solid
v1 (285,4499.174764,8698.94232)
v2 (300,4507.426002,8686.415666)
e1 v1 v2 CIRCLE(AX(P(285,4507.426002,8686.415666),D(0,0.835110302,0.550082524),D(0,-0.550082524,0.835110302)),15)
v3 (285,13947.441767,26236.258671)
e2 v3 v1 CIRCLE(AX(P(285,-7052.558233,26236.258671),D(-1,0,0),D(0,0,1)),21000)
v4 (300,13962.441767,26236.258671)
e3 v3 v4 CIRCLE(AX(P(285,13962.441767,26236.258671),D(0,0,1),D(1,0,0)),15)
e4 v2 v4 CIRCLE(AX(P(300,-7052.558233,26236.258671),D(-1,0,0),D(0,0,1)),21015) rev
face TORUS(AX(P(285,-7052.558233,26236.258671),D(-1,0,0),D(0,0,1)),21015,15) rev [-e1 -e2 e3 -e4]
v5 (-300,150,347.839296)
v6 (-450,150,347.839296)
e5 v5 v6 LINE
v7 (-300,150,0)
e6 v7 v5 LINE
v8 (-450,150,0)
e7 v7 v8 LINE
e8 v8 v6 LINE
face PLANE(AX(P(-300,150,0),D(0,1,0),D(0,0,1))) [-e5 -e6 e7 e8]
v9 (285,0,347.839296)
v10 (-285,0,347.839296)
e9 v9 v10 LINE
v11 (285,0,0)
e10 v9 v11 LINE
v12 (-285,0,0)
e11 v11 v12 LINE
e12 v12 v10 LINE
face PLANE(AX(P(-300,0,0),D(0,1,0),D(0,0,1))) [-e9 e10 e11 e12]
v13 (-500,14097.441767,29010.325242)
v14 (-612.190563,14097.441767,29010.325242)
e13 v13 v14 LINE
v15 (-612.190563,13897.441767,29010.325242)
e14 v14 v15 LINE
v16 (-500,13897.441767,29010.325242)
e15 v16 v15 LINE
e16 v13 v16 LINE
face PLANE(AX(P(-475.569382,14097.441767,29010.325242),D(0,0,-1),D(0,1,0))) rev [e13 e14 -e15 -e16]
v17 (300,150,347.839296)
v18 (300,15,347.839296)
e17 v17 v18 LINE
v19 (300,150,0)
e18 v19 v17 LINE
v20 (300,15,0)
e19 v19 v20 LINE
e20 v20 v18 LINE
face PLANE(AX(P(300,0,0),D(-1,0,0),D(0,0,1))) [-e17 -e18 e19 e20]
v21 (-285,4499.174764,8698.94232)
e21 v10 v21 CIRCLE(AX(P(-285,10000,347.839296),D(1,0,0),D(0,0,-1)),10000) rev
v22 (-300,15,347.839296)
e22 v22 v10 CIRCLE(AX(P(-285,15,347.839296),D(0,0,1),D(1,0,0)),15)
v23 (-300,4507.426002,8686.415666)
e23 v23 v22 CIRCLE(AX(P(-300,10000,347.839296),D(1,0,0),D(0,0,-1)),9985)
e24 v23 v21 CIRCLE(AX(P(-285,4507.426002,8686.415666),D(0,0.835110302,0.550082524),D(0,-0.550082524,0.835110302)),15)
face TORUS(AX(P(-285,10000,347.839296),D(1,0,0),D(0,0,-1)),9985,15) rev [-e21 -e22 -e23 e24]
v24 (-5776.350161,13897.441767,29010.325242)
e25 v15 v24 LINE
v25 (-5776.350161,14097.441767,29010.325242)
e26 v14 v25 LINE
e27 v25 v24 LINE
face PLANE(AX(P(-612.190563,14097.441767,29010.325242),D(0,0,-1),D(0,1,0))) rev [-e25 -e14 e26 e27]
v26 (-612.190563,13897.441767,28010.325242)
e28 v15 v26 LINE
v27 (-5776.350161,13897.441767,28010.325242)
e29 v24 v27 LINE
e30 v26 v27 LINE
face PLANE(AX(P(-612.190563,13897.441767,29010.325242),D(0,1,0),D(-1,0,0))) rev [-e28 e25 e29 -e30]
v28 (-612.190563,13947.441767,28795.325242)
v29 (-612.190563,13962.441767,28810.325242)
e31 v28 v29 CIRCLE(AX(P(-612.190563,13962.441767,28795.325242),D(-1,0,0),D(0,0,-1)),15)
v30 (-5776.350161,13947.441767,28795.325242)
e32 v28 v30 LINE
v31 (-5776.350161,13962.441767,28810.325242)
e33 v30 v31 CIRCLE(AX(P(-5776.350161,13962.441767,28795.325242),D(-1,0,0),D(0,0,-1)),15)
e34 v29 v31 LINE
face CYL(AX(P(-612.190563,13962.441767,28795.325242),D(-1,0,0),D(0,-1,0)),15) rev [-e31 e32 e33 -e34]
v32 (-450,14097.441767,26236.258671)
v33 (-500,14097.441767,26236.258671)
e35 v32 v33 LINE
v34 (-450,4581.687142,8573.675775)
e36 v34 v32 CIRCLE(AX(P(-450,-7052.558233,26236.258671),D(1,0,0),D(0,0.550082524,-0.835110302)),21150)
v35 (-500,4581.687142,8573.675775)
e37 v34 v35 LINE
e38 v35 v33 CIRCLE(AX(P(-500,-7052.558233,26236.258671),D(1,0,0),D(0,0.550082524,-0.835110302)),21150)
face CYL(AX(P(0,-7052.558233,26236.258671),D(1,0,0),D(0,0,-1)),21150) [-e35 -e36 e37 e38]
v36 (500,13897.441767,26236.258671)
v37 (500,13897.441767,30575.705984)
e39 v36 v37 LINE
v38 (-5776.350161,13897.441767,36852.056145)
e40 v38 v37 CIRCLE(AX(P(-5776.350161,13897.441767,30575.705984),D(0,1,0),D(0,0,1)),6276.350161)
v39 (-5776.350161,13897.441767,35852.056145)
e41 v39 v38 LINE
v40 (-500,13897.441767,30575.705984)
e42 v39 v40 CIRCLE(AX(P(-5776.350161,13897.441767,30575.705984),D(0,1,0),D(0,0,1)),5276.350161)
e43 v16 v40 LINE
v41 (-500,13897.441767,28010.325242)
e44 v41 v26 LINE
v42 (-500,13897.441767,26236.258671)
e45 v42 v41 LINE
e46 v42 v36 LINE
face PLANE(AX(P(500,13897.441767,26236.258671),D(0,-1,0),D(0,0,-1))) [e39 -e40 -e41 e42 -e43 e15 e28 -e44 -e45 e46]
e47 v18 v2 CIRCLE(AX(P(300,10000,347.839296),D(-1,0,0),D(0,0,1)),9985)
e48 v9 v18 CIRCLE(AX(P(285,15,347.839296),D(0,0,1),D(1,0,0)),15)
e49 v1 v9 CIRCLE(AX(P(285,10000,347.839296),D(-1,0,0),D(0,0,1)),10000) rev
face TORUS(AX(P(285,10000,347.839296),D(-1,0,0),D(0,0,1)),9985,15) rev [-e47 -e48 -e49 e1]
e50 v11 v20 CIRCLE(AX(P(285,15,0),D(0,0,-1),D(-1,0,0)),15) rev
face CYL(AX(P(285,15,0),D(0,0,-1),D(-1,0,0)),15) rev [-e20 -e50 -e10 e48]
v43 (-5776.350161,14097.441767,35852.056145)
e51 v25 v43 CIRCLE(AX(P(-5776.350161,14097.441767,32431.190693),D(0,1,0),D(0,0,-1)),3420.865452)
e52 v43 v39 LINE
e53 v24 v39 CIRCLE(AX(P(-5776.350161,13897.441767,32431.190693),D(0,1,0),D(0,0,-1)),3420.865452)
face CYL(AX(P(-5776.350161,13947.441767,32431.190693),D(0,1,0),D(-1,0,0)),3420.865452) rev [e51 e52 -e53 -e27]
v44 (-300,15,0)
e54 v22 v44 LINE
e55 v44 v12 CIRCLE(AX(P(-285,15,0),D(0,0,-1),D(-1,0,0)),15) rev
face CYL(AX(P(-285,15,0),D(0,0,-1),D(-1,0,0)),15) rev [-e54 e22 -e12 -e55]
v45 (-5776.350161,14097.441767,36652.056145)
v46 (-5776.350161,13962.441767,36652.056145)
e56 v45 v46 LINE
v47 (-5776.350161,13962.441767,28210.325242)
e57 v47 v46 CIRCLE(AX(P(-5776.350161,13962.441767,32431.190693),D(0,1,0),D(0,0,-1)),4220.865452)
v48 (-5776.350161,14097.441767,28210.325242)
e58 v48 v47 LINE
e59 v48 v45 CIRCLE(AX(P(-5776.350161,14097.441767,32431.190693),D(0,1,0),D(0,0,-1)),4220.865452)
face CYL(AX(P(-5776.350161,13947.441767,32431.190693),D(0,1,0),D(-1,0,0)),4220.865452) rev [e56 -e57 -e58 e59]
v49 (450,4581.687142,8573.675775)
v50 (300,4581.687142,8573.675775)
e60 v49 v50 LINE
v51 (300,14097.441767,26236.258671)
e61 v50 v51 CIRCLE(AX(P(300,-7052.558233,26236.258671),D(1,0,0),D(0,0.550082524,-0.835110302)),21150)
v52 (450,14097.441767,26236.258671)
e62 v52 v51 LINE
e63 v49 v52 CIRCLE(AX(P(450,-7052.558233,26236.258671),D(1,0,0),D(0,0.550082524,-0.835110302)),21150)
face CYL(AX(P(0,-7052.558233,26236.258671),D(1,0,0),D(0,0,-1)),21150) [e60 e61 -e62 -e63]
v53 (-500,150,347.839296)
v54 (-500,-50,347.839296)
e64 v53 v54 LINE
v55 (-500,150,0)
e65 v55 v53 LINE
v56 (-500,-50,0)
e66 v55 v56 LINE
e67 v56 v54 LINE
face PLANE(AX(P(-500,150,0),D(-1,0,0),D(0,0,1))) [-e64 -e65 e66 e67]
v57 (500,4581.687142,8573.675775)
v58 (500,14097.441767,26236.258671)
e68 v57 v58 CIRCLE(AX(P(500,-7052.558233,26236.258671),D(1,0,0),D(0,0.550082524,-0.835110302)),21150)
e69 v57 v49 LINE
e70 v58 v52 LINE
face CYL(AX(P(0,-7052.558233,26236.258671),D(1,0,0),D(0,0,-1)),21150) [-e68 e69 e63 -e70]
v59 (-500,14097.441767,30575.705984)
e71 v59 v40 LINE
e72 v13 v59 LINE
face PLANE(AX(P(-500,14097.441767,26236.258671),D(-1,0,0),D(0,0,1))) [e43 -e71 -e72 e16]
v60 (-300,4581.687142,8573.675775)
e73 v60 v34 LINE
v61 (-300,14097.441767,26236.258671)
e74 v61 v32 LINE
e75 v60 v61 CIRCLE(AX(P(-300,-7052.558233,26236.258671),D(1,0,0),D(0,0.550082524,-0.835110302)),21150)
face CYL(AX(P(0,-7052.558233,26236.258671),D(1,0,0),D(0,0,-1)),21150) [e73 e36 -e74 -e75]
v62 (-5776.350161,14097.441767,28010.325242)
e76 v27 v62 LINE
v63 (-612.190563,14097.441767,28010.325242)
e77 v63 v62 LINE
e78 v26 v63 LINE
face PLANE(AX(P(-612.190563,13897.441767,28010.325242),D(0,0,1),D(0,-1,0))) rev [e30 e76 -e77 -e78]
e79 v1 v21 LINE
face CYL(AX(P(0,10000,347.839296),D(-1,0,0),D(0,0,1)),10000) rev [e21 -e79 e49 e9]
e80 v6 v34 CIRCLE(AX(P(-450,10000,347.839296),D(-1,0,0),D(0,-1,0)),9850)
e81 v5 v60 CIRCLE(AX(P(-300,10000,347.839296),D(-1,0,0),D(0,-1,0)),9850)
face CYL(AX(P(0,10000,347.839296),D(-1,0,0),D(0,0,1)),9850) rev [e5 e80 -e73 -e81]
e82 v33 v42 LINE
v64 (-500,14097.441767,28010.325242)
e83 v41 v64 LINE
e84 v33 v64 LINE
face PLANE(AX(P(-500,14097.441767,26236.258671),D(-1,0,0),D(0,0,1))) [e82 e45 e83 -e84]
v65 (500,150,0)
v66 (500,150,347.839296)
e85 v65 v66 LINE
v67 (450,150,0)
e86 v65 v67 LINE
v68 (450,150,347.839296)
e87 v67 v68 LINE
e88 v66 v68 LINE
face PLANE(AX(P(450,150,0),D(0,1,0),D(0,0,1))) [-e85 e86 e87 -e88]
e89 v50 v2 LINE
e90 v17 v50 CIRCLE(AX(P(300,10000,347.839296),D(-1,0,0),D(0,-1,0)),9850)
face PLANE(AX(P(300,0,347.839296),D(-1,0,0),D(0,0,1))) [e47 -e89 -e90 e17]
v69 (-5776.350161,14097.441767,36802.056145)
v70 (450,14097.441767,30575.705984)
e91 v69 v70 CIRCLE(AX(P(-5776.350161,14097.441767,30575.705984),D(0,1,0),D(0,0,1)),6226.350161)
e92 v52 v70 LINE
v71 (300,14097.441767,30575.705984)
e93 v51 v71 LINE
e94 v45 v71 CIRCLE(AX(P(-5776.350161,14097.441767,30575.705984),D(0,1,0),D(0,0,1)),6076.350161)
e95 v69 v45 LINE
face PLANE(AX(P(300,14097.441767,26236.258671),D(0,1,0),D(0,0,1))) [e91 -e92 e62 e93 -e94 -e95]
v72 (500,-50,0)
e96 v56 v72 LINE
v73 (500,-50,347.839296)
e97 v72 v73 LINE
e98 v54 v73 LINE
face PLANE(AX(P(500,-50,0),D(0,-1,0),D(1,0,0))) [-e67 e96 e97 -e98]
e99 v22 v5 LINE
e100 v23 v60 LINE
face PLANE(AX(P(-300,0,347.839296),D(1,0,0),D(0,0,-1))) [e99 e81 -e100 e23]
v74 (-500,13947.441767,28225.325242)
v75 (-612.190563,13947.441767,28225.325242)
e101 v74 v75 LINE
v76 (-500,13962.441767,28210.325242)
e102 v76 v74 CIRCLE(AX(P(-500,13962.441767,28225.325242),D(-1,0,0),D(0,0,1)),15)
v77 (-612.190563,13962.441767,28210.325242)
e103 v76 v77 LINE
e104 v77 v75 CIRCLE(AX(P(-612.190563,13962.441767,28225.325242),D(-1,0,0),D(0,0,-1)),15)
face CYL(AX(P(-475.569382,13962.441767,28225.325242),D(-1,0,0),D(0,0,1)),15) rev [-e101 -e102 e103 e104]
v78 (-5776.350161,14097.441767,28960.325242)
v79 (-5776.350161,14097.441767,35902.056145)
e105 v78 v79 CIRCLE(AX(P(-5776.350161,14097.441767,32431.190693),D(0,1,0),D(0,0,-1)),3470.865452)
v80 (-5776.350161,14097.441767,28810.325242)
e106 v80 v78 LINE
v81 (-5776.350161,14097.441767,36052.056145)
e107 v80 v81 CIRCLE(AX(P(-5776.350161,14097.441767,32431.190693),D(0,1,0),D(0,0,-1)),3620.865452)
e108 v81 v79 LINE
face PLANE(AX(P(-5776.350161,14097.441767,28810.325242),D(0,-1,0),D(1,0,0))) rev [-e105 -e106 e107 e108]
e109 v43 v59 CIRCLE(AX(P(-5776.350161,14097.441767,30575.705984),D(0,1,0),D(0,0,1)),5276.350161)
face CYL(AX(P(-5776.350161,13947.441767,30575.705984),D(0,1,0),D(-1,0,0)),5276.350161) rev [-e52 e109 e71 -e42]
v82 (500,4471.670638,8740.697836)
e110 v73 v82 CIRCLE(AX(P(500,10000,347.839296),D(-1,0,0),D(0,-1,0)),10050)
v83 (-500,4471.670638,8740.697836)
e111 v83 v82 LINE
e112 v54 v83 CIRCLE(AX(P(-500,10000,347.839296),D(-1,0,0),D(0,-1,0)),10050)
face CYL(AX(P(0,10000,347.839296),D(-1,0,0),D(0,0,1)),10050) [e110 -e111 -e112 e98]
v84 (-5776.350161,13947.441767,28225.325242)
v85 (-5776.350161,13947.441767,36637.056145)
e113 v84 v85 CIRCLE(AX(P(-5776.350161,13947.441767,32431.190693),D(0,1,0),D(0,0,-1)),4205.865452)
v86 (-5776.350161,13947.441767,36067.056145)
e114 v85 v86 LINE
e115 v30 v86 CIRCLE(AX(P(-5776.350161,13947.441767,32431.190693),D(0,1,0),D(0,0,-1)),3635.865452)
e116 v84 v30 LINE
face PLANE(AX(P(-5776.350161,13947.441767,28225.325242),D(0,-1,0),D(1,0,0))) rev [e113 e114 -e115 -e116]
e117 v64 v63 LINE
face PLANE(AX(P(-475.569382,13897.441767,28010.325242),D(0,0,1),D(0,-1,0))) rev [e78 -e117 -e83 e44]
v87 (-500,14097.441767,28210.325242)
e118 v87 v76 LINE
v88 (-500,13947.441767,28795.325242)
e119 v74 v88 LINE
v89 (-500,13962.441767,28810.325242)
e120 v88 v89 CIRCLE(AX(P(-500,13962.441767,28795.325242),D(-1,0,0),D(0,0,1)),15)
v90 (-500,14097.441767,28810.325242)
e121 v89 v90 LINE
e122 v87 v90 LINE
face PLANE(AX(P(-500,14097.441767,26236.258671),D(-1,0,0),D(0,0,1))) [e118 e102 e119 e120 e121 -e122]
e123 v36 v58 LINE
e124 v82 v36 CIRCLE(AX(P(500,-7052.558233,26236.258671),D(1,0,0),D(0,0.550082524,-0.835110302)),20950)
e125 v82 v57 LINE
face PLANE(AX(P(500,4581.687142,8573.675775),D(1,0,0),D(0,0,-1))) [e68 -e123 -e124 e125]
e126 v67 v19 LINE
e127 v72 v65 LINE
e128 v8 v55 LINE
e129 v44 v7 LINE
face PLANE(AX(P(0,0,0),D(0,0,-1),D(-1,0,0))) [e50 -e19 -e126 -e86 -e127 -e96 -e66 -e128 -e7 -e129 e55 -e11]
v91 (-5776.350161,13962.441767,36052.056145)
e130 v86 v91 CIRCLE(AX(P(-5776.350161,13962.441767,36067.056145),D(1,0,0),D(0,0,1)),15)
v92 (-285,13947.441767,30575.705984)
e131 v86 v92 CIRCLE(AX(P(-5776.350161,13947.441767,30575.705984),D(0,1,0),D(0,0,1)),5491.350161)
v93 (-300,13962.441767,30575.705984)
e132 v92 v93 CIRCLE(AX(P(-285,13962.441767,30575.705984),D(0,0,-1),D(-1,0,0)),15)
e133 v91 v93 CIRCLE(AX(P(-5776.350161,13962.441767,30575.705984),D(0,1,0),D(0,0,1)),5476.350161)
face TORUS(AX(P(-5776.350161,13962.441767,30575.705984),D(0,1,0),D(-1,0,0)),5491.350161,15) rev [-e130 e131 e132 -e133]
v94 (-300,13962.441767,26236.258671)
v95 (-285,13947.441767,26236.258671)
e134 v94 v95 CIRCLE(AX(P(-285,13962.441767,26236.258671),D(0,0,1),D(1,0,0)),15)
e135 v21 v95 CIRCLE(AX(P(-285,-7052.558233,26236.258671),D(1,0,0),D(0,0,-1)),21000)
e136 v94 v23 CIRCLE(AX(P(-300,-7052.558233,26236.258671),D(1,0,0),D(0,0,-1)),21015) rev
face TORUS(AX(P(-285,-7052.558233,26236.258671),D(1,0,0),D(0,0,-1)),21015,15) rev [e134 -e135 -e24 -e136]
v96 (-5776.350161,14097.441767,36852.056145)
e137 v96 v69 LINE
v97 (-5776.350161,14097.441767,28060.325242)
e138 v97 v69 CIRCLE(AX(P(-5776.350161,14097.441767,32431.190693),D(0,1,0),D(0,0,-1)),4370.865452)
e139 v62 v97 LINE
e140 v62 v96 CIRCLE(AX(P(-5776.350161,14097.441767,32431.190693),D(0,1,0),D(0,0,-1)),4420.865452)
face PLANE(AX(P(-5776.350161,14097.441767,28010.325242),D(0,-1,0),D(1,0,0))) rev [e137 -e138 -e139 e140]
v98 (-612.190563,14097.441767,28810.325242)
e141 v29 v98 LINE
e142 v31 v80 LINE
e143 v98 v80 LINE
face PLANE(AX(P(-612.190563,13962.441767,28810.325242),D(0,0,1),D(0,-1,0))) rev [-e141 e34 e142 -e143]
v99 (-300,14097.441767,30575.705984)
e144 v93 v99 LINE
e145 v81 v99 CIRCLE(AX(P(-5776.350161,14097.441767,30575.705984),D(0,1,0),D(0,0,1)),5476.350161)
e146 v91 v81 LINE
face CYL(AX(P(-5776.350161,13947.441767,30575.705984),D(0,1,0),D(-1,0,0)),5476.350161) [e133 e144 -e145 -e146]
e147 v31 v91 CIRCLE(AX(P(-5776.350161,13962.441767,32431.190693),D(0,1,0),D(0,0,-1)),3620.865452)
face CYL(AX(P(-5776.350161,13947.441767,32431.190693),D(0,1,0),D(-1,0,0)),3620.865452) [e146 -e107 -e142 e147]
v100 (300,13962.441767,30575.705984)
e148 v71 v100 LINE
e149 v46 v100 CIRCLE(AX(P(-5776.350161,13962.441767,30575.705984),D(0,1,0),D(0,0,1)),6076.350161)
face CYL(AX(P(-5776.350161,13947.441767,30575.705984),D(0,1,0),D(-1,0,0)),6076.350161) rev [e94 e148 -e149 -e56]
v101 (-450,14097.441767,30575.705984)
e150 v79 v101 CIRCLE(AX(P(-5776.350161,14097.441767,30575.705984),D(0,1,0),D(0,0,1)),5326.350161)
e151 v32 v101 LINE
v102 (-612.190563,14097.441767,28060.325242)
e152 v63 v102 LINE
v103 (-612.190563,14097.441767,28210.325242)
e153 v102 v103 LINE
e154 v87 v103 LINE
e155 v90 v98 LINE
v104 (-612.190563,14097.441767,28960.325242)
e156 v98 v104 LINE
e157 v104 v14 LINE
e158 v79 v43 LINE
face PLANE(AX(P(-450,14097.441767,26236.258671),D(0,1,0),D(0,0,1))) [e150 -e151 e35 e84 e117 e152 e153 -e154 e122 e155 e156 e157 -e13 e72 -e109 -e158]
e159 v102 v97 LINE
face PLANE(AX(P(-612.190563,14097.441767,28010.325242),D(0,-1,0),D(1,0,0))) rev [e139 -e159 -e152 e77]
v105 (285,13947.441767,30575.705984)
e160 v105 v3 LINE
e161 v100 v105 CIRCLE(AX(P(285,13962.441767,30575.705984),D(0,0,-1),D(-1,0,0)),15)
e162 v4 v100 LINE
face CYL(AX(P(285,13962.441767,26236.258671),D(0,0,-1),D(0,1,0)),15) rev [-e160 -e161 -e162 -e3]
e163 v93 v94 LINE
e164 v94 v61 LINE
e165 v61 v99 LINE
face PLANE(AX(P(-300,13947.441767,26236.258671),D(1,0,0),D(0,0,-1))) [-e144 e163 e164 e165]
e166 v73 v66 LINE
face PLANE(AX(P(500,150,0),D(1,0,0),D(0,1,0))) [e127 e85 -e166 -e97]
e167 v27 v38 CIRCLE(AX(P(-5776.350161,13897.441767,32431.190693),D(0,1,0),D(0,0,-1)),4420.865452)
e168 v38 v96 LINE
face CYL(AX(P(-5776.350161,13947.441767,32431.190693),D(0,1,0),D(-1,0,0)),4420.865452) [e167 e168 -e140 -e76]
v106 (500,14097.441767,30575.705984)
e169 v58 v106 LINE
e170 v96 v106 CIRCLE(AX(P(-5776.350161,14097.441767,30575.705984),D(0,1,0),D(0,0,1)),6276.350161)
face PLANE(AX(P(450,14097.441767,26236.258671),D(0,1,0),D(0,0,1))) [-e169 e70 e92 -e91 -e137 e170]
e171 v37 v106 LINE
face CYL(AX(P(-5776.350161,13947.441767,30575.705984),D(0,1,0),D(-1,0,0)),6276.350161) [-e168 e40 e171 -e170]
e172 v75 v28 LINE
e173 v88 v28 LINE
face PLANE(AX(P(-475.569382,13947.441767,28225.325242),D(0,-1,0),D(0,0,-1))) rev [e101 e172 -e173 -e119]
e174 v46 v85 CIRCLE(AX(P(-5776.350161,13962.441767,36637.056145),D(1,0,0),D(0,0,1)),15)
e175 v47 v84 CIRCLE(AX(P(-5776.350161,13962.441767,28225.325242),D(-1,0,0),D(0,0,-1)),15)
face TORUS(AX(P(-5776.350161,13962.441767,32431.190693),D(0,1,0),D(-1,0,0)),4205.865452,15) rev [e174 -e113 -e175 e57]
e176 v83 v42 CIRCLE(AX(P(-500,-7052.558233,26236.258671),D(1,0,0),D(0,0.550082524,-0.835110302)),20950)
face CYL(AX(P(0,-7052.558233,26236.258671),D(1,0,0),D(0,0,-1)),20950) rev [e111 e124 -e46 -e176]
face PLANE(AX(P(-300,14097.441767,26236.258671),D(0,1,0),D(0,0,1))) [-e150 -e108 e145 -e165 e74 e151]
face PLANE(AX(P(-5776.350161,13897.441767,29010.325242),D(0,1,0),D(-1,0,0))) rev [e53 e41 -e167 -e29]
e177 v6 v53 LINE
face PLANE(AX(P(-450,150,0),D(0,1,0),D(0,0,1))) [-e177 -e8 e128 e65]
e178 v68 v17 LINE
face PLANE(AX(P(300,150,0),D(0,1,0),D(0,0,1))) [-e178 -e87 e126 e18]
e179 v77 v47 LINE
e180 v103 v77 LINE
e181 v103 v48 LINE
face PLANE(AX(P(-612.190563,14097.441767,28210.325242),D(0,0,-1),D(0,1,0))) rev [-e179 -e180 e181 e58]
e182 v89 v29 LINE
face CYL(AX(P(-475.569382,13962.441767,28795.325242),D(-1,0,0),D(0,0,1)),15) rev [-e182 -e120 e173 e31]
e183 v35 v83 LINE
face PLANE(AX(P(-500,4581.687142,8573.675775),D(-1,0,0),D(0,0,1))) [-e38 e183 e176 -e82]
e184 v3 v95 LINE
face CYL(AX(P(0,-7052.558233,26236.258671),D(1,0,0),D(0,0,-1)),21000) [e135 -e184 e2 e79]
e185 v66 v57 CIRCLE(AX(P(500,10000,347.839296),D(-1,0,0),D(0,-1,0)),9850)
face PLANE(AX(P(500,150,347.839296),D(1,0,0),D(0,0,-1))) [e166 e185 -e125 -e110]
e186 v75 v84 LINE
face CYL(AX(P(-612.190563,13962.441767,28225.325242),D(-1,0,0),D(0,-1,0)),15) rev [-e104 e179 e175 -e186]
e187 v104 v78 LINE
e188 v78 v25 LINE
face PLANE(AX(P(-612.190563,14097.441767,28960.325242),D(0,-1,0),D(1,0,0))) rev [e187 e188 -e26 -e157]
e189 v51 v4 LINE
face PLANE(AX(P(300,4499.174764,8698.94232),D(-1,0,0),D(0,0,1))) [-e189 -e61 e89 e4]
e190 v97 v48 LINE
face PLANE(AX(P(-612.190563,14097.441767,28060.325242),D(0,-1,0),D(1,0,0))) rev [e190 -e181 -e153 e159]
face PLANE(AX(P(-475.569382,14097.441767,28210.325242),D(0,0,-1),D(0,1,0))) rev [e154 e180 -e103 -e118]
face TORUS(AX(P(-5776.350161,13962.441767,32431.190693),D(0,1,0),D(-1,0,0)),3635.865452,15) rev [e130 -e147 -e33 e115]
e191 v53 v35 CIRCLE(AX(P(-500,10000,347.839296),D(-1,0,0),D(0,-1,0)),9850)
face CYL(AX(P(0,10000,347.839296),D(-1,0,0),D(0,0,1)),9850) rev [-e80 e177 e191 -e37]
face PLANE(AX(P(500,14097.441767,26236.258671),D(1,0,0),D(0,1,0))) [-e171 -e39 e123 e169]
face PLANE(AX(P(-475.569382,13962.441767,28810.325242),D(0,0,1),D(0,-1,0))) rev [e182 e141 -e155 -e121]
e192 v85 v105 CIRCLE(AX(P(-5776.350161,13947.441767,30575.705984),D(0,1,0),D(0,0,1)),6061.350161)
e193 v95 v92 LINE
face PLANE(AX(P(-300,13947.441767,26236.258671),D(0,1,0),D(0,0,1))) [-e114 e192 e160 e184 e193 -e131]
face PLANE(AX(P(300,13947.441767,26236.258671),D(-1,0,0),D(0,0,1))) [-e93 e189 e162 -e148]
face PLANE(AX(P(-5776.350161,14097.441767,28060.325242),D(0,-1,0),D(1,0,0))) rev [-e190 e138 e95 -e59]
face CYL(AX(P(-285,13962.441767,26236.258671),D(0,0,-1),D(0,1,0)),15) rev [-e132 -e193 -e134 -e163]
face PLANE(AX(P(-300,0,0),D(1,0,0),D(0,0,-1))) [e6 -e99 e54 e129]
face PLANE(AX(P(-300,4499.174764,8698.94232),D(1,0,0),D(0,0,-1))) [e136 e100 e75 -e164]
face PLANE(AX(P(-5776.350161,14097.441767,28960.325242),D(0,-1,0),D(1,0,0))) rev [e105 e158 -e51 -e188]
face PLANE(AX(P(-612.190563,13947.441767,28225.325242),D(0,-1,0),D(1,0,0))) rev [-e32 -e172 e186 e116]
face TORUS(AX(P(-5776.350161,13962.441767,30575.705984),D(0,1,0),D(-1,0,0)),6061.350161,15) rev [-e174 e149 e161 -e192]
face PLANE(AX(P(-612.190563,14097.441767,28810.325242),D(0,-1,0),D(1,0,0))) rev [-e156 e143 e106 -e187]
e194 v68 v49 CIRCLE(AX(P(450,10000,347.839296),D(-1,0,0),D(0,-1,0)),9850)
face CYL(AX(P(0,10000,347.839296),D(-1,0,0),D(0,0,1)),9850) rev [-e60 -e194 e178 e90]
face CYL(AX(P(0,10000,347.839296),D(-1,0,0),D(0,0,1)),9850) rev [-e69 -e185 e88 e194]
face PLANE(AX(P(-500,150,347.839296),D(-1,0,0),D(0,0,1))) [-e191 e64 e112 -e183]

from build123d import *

# Parameters (mm, degrees)
FILLET3_R      = 15
FILLET4_R      = 15
SWEEP3_START   = 13897.441767453
SWEEP3_DEPTH   = 200
SWEEP3_2_DEPTH = 50
SWEEP3_START_2 = -5776.350160621
SWEEP3_3_DEPTH = 5476.350160621
SWEEP3_4_ANGLE = 180
SWEEP3_5_ANGLE = 90


with BuildPart() as part:
    # Sweep1: sweep along a path in Sketch3
    with BuildLine(Plane(origin=(0, 0, 0), x_dir=(0, 0, -1), z_dir=(1, 0, 0))) as sweep1_path:
        Line((0, 0), (-347.839296309, 0))
        ThreePointArc((-347.839296309, 0), (-5090.820828897, 1196.357220927), (-8698.942320439, 4499.174763695))
        ThreePointArc((-8698.942320439, 4499.174763695), (-16275.997452676, 11435.091603507), (-26236.258671111, 13947.441767453))
        Line((-26236.258671111, 13947.441767453), (-30575.705984425, 13947.441767453))
    # Sketch1 → Sweep1 (sweep)
    with BuildSketch(Plane.XY):
        Polygon((-300, 0), (300, 0), (300, 150), (450, 150), (500, 150), (500, -50), (-500, -50), (-500, 150), (-450, 150), (-300, 150), align=None)
    sweep(path=sweep1_path.line)

    # Fillet3
    fillet3_edges = [part.edges().sort_by_distance(p)[0] for p in [
        (300, 1196.357220927, 5090.820828897),
        (300, 11435.091603507, 16275.997452676),
        (300, 13947.441767453, 28405.982327768),
        (300, 0, 173.919648155),
    ]]
    fillet(fillet3_edges, radius=FILLET3_R)

    # Fillet4
    fillet4_edges = [part.edges().sort_by_distance(p)[0] for p in [
        (-300, 11435.091603507, 16275.997452676),
        (-300, 13947.441767453, 28405.982327768),
        (-300, 0, 173.919648155),
        (-300, 1196.357220927, 5090.820828897),
    ]]
    fillet(fillet4_edges, radius=FILLET4_R)

    # Sweep3: read off the stored shape, not the designer's step
    # Sweep3 outline → Sweep3 (add)
    with BuildSketch(Plane(origin=(0, 0, 0), x_dir=(1, 0, 0), z_dir=(0, 1, 0)).offset(SWEEP3_START)):
        with BuildLine():
            Line((-5776.350160621, -28210.325241689), (-500, -28210.325241689))
            Line((-500, -28210.325241689), (-500, -28010.325241689))
            Line((-500, -28010.325241689), (-5776.350160621, -28010.325241689))
            ThreePointArc((-5776.350160621, -28010.325241689), (-10197.2156123, -32431.190693367), (-5776.350160621, -36852.056145046))
            ThreePointArc((-5776.350160621, -36852.056145046), (-1338.300400944, -35013.755744102), (500, -30575.705984425))
            Line((500, -30575.705984425), (300, -30575.705984425))
            ThreePointArc((300, -30575.705984425), (-1479.721757182, -34872.334387864), (-5776.350160621, -36652.056145046))
            ThreePointArc((-5776.350160621, -36652.056145046), (-9997.2156123, -32431.190693367), (-5776.350160621, -28210.325241689))
        make_face()
        with BuildLine():
            Line((-500, -29010.325241689), (-500, -28810.325241689))
            Line((-500, -28810.325241689), (-5776.350160621, -28810.325241689))
            ThreePointArc((-5776.350160621, -28810.325241689), (-9397.2156123, -32431.190693367), (-5776.350160621, -36052.056145046))
            ThreePointArc((-5776.350160621, -36052.056145046), (-1903.985825894, -34448.070319152), (-300, -30575.705984425))
            Line((-300, -30575.705984425), (-500, -30575.705984425))
            ThreePointArc((-500, -30575.705984425), (-2045.407182131, -34306.648962915), (-5776.350160621, -35852.056145046))
            ThreePointArc((-5776.350160621, -35852.056145046), (-9197.2156123, -32431.190693367), (-5776.350160621, -29010.325241689))
            Line((-5776.350160621, -29010.325241689), (-500, -29010.325241689))
        make_face()
    extrude(amount=SWEEP3_DEPTH)

    # Sweep3 2 outline → Sweep3 2 (add)
    with BuildSketch(Plane(origin=(0, 0, 0), x_dir=(1, 0, 0), z_dir=(0, 1, 0)).offset(SWEEP3_START)):
        with BuildLine():
            Line((-500, -28810.325241689), (-500, -28210.325241689))
            Line((-500, -28210.325241689), (-5776.350160621, -28210.325241689))
            ThreePointArc((-5776.350160621, -28210.325241689), (-9997.2156123, -32431.190693367), (-5776.350160621, -36652.056145046))
            ThreePointArc((-5776.350160621, -36652.056145046), (-1479.721757182, -34872.334387864), (300, -30575.705984425))
            Line((300, -30575.705984425), (-300, -30575.705984425))
            ThreePointArc((-300, -30575.705984425), (-1903.985825894, -34448.070319152), (-5776.350160621, -36052.056145046))
            ThreePointArc((-5776.350160621, -36052.056145046), (-9397.2156123, -32431.190693367), (-5776.350160621, -28810.325241689))
            Line((-5776.350160621, -28810.325241689), (-500, -28810.325241689))
        make_face()
    extrude(amount=SWEEP3_2_DEPTH)

    # Sweep3 3 outline → Sweep3 3 (add)
    with BuildSketch(Plane.YZ.offset(SWEEP3_START_2)):
        with BuildLine():
            Line((13947.441767453, 28210.325241689), (13962.441767453, 28210.325241689))
            ThreePointArc((13962.441767453, 28210.325241689), (13951.835165735, 28214.718639971), (13947.441767453, 28225.325241689))
            Line((13947.441767453, 28225.325241689), (13947.441767453, 28210.325241689))
        make_face()
        with BuildLine():
            Line((13947.441767453, 28810.325241689), (13947.441767453, 28795.325241689))
            ThreePointArc((13947.441767453, 28795.325241689), (13951.835165735, 28805.931843407), (13962.441767453, 28810.325241689))
            Line((13962.441767453, 28810.325241689), (13947.441767453, 28810.325241689))
        make_face()
    extrude(amount=SWEEP3_3_DEPTH)

    # Sweep3 4 outline → Sweep3 4 (revolve)
    with BuildSketch(Plane(origin=(-5776.350160621, 0, 32431.190693368), x_dir=(0, 0, -1), z_dir=(1, 0, 0))):
        with BuildLine():
            ThreePointArc((4220.865451679, 13962.441767453), (4216.472053397, 13951.835165735), (4205.865451679, 13947.441767453))
            Line((4205.865451679, 13947.441767453), (4220.865451679, 13947.441767453))
            Line((4220.865451679, 13947.441767453), (4220.865451679, 13962.441767453))
        make_face()
        with BuildLine():
            Line((3620.865451679, 13947.441767453), (3635.865451679, 13947.441767453))
            ThreePointArc((3635.865451679, 13947.441767453), (3625.258849961, 13951.835165735), (3620.865451679, 13962.441767453))
            Line((3620.865451679, 13962.441767453), (3620.865451679, 13947.441767453))
        make_face()
    revolve(axis=Axis((-5776.350160621, 0, 32431.190693368), (0, 1, 0)), revolution_arc=SWEEP3_4_ANGLE)

    # Sweep3 5 outline → Sweep3 5 (revolve)
    with BuildSketch(Plane(origin=(-5776.350160621, 0, 30575.705984425), x_dir=(0, 0, 1), z_dir=(-1, 0, 0))):
        with BuildLine():
            ThreePointArc((6076.350160621, 13962.441767453), (6071.956762339, 13951.835165735), (6061.350160621, 13947.441767453))
            Line((6061.350160621, 13947.441767453), (6076.350160621, 13947.441767453))
            Line((6076.350160621, 13947.441767453), (6076.350160621, 13962.441767453))
        make_face()
        with BuildLine():
            Line((5476.350160621, 13947.441767453), (5491.350160622, 13947.441767453))
            ThreePointArc((5491.350160622, 13947.441767453), (5480.743558904, 13951.835165735), (5476.350160621, 13962.441767453))
            Line((5476.350160621, 13962.441767453), (5476.350160621, 13947.441767453))
        make_face()
    revolve(axis=Axis((-5776.350160621, 0, 30575.705984425), (0, 1, 0)), revolution_arc=SWEEP3_5_ANGLE)


solid = part.part
